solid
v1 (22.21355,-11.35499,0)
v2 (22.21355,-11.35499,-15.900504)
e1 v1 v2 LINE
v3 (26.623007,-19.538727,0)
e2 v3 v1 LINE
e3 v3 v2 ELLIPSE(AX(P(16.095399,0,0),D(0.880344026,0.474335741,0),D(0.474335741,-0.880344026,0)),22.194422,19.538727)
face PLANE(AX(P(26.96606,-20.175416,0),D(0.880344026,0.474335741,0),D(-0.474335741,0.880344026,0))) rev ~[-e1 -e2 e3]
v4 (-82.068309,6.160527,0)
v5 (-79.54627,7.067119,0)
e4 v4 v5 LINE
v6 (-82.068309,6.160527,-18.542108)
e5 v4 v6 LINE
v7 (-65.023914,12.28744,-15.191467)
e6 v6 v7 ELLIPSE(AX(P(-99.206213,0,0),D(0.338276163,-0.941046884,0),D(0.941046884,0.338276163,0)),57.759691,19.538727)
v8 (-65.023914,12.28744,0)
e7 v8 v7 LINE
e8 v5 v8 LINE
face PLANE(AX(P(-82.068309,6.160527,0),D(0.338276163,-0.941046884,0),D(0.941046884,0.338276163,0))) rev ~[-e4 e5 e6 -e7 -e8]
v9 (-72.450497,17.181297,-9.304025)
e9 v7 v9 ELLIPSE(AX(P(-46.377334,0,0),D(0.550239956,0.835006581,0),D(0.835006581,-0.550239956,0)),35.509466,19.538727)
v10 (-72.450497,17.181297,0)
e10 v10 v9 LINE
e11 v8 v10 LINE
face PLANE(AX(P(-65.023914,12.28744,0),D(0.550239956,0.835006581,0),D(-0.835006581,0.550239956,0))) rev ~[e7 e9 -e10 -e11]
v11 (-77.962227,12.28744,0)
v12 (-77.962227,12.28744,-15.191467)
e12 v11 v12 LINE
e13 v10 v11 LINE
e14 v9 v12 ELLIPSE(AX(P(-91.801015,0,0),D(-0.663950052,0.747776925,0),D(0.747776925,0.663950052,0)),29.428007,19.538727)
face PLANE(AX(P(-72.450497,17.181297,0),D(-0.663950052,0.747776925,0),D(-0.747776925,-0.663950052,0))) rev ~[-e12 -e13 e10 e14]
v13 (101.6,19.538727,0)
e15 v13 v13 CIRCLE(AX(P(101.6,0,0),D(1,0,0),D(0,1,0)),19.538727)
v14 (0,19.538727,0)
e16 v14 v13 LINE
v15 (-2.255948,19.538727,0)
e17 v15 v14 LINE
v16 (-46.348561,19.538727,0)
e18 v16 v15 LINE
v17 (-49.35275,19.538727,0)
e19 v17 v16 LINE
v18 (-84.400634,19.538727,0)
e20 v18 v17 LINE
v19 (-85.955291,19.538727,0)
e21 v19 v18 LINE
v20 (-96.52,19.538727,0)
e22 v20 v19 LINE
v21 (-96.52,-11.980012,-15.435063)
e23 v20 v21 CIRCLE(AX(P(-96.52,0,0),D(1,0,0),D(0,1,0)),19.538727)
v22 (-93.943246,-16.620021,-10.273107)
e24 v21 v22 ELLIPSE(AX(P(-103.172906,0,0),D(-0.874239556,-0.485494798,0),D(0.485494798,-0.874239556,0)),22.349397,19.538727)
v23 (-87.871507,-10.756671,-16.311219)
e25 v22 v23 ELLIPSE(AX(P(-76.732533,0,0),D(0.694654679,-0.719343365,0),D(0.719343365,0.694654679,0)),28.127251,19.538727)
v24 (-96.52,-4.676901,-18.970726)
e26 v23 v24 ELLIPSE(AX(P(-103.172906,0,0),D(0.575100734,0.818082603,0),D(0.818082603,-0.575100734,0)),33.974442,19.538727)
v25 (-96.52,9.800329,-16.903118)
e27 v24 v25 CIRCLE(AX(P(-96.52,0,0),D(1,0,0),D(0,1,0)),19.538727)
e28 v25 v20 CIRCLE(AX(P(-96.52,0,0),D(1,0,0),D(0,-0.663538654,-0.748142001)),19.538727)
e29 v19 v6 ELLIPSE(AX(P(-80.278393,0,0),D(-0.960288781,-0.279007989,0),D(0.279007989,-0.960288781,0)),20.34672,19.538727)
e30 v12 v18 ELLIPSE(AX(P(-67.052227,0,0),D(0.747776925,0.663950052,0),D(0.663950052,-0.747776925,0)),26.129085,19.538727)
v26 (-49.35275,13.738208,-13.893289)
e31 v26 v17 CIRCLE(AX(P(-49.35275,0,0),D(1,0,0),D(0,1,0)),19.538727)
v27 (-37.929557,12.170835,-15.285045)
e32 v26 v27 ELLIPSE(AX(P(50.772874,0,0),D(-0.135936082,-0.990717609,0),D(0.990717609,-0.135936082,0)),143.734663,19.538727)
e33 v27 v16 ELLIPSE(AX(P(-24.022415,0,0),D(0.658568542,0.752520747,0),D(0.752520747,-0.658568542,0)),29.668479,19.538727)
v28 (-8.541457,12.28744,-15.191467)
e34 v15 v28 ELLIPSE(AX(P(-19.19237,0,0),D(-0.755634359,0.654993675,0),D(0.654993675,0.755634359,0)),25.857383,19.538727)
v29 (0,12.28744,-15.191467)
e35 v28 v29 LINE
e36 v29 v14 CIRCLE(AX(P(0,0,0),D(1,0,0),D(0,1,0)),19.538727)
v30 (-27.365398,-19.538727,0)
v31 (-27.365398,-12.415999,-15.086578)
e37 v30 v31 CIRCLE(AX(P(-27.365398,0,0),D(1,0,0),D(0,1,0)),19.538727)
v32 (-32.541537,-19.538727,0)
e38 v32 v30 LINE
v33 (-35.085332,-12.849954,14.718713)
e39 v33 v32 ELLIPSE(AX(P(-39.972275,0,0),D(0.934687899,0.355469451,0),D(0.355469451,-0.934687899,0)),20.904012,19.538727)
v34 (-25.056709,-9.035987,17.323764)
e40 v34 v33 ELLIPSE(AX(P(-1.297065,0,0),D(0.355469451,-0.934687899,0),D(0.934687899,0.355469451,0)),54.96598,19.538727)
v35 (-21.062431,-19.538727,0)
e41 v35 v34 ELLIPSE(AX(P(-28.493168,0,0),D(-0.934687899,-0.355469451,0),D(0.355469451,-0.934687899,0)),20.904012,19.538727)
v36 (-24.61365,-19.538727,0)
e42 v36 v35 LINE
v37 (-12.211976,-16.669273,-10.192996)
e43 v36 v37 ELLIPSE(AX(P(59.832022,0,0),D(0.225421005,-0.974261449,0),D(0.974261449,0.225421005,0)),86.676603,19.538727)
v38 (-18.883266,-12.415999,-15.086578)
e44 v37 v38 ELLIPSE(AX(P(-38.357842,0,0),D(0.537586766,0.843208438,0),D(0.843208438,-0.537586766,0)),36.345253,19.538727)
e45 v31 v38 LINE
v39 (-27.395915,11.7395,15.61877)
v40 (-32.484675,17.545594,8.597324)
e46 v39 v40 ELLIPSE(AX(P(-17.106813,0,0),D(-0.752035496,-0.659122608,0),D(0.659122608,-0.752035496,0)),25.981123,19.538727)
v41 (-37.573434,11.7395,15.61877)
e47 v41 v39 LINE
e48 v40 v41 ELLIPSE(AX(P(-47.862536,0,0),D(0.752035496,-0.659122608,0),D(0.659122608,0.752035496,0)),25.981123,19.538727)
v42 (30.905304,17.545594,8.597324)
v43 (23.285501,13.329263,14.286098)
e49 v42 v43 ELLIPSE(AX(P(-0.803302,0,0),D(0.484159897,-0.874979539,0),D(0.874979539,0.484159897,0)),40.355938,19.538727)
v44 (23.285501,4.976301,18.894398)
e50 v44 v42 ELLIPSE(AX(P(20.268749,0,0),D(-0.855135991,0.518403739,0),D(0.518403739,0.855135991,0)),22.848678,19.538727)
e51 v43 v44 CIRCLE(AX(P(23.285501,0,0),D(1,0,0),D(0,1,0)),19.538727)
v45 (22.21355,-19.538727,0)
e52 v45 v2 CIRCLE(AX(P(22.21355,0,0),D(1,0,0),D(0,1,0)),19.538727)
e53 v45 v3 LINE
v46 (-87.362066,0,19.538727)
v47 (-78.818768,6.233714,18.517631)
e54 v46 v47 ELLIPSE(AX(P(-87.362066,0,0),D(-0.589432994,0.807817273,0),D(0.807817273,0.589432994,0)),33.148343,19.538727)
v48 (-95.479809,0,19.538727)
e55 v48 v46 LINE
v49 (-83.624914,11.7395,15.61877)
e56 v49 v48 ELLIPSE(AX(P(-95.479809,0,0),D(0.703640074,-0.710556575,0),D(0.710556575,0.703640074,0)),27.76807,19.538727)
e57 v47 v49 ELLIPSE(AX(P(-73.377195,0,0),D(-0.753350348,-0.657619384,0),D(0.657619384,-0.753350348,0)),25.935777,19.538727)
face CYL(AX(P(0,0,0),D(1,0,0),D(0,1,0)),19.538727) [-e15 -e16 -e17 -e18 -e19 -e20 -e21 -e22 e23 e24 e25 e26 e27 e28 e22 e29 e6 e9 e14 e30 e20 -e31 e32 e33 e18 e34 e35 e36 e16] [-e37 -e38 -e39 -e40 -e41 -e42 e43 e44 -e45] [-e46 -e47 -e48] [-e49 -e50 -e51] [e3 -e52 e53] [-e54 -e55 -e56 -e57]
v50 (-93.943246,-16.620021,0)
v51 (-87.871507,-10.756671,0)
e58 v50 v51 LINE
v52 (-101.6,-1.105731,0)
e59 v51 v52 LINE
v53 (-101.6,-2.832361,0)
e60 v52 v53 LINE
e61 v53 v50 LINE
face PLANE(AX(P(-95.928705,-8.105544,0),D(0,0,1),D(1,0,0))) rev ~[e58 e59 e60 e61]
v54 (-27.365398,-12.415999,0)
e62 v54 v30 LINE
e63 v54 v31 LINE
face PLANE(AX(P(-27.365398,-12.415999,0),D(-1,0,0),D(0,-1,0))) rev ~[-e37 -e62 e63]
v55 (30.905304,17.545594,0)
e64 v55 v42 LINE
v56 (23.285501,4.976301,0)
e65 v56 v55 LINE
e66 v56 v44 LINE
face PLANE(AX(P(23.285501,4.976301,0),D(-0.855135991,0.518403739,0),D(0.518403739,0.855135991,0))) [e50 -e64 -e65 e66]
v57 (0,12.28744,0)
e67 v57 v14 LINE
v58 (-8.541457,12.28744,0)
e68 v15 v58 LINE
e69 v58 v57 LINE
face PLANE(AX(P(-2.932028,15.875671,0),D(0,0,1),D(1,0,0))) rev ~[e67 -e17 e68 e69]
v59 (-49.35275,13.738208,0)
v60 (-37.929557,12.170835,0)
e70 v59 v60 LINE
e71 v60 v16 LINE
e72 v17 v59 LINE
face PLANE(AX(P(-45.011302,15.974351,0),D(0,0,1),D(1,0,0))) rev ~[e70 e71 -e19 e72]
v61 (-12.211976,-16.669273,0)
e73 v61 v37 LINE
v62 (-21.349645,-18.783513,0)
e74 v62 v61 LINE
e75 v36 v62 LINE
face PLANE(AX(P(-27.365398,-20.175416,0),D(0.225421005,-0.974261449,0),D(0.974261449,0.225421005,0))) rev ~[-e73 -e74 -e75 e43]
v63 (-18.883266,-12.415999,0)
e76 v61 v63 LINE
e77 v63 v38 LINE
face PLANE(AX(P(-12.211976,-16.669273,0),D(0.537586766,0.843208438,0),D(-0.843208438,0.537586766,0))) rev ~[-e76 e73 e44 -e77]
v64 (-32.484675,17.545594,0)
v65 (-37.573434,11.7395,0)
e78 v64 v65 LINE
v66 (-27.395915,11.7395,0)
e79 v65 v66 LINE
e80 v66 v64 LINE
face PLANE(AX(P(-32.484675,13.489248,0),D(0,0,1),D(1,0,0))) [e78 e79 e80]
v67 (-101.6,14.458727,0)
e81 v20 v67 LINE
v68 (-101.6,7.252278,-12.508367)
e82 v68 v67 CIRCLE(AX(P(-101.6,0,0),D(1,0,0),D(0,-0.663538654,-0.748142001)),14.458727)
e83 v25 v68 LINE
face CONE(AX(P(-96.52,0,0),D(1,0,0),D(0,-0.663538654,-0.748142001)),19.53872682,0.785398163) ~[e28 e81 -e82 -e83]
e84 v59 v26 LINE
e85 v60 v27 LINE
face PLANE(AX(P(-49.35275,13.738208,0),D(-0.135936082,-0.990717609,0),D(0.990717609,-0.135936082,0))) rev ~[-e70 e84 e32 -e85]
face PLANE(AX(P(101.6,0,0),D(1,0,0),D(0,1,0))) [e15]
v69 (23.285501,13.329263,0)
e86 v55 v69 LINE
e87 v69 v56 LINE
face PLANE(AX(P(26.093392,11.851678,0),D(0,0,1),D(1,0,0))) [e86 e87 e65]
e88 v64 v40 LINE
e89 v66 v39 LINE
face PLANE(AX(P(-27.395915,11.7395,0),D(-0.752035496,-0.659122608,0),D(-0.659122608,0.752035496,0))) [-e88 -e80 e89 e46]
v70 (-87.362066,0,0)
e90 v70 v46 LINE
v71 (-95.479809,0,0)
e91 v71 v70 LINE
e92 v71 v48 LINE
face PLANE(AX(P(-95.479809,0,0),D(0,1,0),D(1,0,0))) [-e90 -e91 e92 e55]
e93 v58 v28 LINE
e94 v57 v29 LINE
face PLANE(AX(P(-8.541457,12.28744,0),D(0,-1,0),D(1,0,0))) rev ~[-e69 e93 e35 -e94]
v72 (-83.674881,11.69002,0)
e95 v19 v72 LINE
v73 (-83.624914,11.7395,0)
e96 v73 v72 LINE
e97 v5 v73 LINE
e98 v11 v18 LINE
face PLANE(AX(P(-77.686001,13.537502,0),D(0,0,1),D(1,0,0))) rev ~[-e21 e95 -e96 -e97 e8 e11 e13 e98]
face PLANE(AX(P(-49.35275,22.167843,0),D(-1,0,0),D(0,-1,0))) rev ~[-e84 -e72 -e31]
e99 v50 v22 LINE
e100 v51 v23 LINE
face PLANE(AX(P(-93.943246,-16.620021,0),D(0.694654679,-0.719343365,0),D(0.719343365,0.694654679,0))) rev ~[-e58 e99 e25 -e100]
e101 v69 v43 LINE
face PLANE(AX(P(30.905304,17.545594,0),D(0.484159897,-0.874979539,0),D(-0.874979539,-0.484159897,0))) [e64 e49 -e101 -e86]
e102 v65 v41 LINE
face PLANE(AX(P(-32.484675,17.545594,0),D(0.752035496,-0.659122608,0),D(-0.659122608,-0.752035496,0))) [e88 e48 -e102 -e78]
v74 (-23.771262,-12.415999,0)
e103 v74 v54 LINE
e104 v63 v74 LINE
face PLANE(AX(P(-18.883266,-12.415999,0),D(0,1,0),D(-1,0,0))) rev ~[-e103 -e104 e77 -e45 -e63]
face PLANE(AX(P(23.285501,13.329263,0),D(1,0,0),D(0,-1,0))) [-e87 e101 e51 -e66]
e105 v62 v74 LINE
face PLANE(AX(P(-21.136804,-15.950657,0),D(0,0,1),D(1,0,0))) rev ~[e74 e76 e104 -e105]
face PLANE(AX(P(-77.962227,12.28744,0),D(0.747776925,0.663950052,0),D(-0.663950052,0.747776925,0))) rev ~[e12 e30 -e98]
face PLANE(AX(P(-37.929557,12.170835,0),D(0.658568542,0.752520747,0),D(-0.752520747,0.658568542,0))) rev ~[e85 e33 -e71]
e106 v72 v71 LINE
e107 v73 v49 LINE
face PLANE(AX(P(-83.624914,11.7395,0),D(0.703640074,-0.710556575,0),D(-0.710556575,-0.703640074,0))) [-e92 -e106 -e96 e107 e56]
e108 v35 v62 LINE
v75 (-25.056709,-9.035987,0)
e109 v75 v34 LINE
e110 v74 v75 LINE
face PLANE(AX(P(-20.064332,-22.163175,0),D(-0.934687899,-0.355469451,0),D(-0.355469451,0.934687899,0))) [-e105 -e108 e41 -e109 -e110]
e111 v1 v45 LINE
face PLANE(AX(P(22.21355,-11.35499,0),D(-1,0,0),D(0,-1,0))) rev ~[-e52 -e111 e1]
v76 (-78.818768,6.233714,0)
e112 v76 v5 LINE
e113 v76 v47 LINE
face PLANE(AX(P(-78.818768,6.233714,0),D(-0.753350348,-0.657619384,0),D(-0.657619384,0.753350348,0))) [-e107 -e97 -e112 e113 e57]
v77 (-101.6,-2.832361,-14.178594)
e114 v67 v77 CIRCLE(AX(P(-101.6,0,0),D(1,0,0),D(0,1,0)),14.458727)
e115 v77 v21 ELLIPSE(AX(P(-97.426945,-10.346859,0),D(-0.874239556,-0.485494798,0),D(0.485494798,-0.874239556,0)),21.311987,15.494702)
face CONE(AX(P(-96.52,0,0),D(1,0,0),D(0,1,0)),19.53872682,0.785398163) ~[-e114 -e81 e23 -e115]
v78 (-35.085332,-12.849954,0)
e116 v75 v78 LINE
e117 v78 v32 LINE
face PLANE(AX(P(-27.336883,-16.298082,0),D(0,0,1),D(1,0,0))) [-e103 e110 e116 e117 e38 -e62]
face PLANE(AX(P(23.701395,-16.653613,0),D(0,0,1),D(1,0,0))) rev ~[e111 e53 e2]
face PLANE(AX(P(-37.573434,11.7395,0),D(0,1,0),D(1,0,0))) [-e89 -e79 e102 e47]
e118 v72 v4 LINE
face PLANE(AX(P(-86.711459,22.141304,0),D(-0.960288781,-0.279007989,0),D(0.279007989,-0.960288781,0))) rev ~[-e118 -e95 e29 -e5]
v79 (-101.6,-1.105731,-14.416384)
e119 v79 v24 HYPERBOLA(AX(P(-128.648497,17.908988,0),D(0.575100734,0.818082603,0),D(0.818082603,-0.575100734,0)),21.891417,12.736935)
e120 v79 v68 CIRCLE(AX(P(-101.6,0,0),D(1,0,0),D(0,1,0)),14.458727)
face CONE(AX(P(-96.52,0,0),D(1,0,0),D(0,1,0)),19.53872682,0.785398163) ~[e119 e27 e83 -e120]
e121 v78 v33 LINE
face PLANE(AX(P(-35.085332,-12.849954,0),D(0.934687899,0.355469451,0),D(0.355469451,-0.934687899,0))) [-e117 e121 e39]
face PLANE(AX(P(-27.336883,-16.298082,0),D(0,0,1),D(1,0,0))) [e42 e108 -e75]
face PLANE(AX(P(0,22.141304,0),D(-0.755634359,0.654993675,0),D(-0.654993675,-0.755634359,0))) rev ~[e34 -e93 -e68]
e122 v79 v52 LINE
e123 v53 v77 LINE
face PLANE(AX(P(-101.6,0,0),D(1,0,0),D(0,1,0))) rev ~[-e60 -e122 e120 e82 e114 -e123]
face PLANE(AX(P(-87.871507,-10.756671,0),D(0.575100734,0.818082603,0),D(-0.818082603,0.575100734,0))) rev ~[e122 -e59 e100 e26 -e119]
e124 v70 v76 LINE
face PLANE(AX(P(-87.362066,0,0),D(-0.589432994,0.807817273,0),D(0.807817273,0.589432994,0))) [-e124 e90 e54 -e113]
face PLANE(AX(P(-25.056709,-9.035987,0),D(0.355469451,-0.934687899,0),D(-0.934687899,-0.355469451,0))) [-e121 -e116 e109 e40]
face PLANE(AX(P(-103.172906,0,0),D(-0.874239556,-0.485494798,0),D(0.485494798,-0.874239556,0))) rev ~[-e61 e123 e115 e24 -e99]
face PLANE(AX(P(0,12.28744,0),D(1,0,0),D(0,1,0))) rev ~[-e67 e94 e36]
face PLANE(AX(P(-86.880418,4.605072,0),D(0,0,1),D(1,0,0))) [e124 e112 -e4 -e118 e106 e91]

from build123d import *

# Parameters (mm, degrees)
F0_R        = 19.5387268204
F1_DEPTH    = 101.6
F3_DEPTH    = 38.1
F5_DEPTH    = 25.4
F7_DEPTH    = 25.4
F8_T2_ANGLE = 300.1049055837
F8_T4_ANGLE = 131.5703123603


# Not quite as in the source:
# - a fillet or chamfer that OpenCascade refuses, or shapes differently, is made with other operations: its cross-section is extruded or revolved along the edge and cut away or added


with BuildPart() as f1:
    # F0 (on Right) → F1 (new body, symmetric)
    with BuildSketch(Plane.YZ):
        Circle(F0_R)
    extrude(amount=F1_DEPTH, both=True)

    # F2 (on Top) → F3 (cut)
    with BuildSketch(Plane.XY):
        Polygon((-49.3527501822, 13.7382084504), (-37.9295572639, 12.1708353981), (-49.3527501822, 22.1678428352), align=None)
    extrude(amount=-F3_DEPTH, mode=Mode.SUBTRACT)

    # F4 (on Top) → F5 (cut)
    with BuildSketch(Plane.XY):
        Polygon((-103.1729057431, 0), (-93.9432457089, -16.6200213134), (-87.8715068102, -10.7566714287), align=None)
        Polygon((22.2135502845, -11.3549903035), (22.2135502845, -20.1754160225), (26.9660595804, -20.1754160225), align=None)
        Polygon((-77.9622271657, 12.2874397784), (-86.7114588618, 22.1413038671), (-82.0683091879, 6.1605265364), (-65.0239139795, 12.2874397784), (-72.4504972355, 17.1812968249), align=None)
        Polygon((0, 22.1413038671), (-8.541457355, 12.2874397784), (0, 12.2874397784), align=None)
        Polygon((-27.3653976619, -12.4159986153), (-27.3653976619, -20.1754160225), (-12.2119756415, -16.6692733765), (-18.8832655549, -12.4159986153), align=None)
    extrude(amount=-F5_DEPTH, mode=Mode.SUBTRACT)

    # F6 (on Top) → F7 (cut)
    with BuildSketch(Plane.XY):
        Polygon((-32.052900187, -20.8235712349), (-20.0643315911, -22.1631750464), (-25.0567086041, -9.0359868482), (-35.0853319095, -12.8499542954), align=None)
        Polygon((23.2855007052, 4.9763009883), (30.9053044766, 17.5455939025), (23.2855007052, 13.3292628452), align=None)
        Polygon((-78.8187682629, 6.2337135896), (-83.6249142885, 11.739499867), (-95.4798087478, 0), (-87.3620659113, 0), align=None)
        Polygon((-32.4846748263, 17.5455939025), (-37.5734344125, 11.739499867), (-27.39591524, 11.739499867), align=None)
    extrude(amount=F7_DEPTH, mode=Mode.SUBTRACT)

    # F8: chamfer of 5.08 on 1 edges, made by hand

    # F8_s1 → F8_t2 (revolve, cut)
    with BuildSketch(Plane.XY):
        Polygon((-96.52, 19.5387268204), (-101.6, 14.4587268204), (-101.6, 19.5387268204), align=None)
    revolve(axis=Axis((-101.6, 0, 0), (1, 0, 0)), revolution_arc=F8_T2_ANGLE, mode=Mode.SUBTRACT)

    # F8_s3 → F8_t4 (revolve, cut)
    with BuildSketch(Plane(origin=(0, 0, 0), x_dir=(1, 0, 0), z_dir=(0, -0.7481420015, 0.6635386542))):
        Polygon((-96.52, -19.5387268204), (-101.6, -14.4587268204), (-101.6, -19.5387268204), align=None)
    revolve(axis=Axis((-101.6, 0, 0), (1, 0, 0)), revolution_arc=F8_T4_ANGLE, mode=Mode.SUBTRACT)


solid = f1.part
